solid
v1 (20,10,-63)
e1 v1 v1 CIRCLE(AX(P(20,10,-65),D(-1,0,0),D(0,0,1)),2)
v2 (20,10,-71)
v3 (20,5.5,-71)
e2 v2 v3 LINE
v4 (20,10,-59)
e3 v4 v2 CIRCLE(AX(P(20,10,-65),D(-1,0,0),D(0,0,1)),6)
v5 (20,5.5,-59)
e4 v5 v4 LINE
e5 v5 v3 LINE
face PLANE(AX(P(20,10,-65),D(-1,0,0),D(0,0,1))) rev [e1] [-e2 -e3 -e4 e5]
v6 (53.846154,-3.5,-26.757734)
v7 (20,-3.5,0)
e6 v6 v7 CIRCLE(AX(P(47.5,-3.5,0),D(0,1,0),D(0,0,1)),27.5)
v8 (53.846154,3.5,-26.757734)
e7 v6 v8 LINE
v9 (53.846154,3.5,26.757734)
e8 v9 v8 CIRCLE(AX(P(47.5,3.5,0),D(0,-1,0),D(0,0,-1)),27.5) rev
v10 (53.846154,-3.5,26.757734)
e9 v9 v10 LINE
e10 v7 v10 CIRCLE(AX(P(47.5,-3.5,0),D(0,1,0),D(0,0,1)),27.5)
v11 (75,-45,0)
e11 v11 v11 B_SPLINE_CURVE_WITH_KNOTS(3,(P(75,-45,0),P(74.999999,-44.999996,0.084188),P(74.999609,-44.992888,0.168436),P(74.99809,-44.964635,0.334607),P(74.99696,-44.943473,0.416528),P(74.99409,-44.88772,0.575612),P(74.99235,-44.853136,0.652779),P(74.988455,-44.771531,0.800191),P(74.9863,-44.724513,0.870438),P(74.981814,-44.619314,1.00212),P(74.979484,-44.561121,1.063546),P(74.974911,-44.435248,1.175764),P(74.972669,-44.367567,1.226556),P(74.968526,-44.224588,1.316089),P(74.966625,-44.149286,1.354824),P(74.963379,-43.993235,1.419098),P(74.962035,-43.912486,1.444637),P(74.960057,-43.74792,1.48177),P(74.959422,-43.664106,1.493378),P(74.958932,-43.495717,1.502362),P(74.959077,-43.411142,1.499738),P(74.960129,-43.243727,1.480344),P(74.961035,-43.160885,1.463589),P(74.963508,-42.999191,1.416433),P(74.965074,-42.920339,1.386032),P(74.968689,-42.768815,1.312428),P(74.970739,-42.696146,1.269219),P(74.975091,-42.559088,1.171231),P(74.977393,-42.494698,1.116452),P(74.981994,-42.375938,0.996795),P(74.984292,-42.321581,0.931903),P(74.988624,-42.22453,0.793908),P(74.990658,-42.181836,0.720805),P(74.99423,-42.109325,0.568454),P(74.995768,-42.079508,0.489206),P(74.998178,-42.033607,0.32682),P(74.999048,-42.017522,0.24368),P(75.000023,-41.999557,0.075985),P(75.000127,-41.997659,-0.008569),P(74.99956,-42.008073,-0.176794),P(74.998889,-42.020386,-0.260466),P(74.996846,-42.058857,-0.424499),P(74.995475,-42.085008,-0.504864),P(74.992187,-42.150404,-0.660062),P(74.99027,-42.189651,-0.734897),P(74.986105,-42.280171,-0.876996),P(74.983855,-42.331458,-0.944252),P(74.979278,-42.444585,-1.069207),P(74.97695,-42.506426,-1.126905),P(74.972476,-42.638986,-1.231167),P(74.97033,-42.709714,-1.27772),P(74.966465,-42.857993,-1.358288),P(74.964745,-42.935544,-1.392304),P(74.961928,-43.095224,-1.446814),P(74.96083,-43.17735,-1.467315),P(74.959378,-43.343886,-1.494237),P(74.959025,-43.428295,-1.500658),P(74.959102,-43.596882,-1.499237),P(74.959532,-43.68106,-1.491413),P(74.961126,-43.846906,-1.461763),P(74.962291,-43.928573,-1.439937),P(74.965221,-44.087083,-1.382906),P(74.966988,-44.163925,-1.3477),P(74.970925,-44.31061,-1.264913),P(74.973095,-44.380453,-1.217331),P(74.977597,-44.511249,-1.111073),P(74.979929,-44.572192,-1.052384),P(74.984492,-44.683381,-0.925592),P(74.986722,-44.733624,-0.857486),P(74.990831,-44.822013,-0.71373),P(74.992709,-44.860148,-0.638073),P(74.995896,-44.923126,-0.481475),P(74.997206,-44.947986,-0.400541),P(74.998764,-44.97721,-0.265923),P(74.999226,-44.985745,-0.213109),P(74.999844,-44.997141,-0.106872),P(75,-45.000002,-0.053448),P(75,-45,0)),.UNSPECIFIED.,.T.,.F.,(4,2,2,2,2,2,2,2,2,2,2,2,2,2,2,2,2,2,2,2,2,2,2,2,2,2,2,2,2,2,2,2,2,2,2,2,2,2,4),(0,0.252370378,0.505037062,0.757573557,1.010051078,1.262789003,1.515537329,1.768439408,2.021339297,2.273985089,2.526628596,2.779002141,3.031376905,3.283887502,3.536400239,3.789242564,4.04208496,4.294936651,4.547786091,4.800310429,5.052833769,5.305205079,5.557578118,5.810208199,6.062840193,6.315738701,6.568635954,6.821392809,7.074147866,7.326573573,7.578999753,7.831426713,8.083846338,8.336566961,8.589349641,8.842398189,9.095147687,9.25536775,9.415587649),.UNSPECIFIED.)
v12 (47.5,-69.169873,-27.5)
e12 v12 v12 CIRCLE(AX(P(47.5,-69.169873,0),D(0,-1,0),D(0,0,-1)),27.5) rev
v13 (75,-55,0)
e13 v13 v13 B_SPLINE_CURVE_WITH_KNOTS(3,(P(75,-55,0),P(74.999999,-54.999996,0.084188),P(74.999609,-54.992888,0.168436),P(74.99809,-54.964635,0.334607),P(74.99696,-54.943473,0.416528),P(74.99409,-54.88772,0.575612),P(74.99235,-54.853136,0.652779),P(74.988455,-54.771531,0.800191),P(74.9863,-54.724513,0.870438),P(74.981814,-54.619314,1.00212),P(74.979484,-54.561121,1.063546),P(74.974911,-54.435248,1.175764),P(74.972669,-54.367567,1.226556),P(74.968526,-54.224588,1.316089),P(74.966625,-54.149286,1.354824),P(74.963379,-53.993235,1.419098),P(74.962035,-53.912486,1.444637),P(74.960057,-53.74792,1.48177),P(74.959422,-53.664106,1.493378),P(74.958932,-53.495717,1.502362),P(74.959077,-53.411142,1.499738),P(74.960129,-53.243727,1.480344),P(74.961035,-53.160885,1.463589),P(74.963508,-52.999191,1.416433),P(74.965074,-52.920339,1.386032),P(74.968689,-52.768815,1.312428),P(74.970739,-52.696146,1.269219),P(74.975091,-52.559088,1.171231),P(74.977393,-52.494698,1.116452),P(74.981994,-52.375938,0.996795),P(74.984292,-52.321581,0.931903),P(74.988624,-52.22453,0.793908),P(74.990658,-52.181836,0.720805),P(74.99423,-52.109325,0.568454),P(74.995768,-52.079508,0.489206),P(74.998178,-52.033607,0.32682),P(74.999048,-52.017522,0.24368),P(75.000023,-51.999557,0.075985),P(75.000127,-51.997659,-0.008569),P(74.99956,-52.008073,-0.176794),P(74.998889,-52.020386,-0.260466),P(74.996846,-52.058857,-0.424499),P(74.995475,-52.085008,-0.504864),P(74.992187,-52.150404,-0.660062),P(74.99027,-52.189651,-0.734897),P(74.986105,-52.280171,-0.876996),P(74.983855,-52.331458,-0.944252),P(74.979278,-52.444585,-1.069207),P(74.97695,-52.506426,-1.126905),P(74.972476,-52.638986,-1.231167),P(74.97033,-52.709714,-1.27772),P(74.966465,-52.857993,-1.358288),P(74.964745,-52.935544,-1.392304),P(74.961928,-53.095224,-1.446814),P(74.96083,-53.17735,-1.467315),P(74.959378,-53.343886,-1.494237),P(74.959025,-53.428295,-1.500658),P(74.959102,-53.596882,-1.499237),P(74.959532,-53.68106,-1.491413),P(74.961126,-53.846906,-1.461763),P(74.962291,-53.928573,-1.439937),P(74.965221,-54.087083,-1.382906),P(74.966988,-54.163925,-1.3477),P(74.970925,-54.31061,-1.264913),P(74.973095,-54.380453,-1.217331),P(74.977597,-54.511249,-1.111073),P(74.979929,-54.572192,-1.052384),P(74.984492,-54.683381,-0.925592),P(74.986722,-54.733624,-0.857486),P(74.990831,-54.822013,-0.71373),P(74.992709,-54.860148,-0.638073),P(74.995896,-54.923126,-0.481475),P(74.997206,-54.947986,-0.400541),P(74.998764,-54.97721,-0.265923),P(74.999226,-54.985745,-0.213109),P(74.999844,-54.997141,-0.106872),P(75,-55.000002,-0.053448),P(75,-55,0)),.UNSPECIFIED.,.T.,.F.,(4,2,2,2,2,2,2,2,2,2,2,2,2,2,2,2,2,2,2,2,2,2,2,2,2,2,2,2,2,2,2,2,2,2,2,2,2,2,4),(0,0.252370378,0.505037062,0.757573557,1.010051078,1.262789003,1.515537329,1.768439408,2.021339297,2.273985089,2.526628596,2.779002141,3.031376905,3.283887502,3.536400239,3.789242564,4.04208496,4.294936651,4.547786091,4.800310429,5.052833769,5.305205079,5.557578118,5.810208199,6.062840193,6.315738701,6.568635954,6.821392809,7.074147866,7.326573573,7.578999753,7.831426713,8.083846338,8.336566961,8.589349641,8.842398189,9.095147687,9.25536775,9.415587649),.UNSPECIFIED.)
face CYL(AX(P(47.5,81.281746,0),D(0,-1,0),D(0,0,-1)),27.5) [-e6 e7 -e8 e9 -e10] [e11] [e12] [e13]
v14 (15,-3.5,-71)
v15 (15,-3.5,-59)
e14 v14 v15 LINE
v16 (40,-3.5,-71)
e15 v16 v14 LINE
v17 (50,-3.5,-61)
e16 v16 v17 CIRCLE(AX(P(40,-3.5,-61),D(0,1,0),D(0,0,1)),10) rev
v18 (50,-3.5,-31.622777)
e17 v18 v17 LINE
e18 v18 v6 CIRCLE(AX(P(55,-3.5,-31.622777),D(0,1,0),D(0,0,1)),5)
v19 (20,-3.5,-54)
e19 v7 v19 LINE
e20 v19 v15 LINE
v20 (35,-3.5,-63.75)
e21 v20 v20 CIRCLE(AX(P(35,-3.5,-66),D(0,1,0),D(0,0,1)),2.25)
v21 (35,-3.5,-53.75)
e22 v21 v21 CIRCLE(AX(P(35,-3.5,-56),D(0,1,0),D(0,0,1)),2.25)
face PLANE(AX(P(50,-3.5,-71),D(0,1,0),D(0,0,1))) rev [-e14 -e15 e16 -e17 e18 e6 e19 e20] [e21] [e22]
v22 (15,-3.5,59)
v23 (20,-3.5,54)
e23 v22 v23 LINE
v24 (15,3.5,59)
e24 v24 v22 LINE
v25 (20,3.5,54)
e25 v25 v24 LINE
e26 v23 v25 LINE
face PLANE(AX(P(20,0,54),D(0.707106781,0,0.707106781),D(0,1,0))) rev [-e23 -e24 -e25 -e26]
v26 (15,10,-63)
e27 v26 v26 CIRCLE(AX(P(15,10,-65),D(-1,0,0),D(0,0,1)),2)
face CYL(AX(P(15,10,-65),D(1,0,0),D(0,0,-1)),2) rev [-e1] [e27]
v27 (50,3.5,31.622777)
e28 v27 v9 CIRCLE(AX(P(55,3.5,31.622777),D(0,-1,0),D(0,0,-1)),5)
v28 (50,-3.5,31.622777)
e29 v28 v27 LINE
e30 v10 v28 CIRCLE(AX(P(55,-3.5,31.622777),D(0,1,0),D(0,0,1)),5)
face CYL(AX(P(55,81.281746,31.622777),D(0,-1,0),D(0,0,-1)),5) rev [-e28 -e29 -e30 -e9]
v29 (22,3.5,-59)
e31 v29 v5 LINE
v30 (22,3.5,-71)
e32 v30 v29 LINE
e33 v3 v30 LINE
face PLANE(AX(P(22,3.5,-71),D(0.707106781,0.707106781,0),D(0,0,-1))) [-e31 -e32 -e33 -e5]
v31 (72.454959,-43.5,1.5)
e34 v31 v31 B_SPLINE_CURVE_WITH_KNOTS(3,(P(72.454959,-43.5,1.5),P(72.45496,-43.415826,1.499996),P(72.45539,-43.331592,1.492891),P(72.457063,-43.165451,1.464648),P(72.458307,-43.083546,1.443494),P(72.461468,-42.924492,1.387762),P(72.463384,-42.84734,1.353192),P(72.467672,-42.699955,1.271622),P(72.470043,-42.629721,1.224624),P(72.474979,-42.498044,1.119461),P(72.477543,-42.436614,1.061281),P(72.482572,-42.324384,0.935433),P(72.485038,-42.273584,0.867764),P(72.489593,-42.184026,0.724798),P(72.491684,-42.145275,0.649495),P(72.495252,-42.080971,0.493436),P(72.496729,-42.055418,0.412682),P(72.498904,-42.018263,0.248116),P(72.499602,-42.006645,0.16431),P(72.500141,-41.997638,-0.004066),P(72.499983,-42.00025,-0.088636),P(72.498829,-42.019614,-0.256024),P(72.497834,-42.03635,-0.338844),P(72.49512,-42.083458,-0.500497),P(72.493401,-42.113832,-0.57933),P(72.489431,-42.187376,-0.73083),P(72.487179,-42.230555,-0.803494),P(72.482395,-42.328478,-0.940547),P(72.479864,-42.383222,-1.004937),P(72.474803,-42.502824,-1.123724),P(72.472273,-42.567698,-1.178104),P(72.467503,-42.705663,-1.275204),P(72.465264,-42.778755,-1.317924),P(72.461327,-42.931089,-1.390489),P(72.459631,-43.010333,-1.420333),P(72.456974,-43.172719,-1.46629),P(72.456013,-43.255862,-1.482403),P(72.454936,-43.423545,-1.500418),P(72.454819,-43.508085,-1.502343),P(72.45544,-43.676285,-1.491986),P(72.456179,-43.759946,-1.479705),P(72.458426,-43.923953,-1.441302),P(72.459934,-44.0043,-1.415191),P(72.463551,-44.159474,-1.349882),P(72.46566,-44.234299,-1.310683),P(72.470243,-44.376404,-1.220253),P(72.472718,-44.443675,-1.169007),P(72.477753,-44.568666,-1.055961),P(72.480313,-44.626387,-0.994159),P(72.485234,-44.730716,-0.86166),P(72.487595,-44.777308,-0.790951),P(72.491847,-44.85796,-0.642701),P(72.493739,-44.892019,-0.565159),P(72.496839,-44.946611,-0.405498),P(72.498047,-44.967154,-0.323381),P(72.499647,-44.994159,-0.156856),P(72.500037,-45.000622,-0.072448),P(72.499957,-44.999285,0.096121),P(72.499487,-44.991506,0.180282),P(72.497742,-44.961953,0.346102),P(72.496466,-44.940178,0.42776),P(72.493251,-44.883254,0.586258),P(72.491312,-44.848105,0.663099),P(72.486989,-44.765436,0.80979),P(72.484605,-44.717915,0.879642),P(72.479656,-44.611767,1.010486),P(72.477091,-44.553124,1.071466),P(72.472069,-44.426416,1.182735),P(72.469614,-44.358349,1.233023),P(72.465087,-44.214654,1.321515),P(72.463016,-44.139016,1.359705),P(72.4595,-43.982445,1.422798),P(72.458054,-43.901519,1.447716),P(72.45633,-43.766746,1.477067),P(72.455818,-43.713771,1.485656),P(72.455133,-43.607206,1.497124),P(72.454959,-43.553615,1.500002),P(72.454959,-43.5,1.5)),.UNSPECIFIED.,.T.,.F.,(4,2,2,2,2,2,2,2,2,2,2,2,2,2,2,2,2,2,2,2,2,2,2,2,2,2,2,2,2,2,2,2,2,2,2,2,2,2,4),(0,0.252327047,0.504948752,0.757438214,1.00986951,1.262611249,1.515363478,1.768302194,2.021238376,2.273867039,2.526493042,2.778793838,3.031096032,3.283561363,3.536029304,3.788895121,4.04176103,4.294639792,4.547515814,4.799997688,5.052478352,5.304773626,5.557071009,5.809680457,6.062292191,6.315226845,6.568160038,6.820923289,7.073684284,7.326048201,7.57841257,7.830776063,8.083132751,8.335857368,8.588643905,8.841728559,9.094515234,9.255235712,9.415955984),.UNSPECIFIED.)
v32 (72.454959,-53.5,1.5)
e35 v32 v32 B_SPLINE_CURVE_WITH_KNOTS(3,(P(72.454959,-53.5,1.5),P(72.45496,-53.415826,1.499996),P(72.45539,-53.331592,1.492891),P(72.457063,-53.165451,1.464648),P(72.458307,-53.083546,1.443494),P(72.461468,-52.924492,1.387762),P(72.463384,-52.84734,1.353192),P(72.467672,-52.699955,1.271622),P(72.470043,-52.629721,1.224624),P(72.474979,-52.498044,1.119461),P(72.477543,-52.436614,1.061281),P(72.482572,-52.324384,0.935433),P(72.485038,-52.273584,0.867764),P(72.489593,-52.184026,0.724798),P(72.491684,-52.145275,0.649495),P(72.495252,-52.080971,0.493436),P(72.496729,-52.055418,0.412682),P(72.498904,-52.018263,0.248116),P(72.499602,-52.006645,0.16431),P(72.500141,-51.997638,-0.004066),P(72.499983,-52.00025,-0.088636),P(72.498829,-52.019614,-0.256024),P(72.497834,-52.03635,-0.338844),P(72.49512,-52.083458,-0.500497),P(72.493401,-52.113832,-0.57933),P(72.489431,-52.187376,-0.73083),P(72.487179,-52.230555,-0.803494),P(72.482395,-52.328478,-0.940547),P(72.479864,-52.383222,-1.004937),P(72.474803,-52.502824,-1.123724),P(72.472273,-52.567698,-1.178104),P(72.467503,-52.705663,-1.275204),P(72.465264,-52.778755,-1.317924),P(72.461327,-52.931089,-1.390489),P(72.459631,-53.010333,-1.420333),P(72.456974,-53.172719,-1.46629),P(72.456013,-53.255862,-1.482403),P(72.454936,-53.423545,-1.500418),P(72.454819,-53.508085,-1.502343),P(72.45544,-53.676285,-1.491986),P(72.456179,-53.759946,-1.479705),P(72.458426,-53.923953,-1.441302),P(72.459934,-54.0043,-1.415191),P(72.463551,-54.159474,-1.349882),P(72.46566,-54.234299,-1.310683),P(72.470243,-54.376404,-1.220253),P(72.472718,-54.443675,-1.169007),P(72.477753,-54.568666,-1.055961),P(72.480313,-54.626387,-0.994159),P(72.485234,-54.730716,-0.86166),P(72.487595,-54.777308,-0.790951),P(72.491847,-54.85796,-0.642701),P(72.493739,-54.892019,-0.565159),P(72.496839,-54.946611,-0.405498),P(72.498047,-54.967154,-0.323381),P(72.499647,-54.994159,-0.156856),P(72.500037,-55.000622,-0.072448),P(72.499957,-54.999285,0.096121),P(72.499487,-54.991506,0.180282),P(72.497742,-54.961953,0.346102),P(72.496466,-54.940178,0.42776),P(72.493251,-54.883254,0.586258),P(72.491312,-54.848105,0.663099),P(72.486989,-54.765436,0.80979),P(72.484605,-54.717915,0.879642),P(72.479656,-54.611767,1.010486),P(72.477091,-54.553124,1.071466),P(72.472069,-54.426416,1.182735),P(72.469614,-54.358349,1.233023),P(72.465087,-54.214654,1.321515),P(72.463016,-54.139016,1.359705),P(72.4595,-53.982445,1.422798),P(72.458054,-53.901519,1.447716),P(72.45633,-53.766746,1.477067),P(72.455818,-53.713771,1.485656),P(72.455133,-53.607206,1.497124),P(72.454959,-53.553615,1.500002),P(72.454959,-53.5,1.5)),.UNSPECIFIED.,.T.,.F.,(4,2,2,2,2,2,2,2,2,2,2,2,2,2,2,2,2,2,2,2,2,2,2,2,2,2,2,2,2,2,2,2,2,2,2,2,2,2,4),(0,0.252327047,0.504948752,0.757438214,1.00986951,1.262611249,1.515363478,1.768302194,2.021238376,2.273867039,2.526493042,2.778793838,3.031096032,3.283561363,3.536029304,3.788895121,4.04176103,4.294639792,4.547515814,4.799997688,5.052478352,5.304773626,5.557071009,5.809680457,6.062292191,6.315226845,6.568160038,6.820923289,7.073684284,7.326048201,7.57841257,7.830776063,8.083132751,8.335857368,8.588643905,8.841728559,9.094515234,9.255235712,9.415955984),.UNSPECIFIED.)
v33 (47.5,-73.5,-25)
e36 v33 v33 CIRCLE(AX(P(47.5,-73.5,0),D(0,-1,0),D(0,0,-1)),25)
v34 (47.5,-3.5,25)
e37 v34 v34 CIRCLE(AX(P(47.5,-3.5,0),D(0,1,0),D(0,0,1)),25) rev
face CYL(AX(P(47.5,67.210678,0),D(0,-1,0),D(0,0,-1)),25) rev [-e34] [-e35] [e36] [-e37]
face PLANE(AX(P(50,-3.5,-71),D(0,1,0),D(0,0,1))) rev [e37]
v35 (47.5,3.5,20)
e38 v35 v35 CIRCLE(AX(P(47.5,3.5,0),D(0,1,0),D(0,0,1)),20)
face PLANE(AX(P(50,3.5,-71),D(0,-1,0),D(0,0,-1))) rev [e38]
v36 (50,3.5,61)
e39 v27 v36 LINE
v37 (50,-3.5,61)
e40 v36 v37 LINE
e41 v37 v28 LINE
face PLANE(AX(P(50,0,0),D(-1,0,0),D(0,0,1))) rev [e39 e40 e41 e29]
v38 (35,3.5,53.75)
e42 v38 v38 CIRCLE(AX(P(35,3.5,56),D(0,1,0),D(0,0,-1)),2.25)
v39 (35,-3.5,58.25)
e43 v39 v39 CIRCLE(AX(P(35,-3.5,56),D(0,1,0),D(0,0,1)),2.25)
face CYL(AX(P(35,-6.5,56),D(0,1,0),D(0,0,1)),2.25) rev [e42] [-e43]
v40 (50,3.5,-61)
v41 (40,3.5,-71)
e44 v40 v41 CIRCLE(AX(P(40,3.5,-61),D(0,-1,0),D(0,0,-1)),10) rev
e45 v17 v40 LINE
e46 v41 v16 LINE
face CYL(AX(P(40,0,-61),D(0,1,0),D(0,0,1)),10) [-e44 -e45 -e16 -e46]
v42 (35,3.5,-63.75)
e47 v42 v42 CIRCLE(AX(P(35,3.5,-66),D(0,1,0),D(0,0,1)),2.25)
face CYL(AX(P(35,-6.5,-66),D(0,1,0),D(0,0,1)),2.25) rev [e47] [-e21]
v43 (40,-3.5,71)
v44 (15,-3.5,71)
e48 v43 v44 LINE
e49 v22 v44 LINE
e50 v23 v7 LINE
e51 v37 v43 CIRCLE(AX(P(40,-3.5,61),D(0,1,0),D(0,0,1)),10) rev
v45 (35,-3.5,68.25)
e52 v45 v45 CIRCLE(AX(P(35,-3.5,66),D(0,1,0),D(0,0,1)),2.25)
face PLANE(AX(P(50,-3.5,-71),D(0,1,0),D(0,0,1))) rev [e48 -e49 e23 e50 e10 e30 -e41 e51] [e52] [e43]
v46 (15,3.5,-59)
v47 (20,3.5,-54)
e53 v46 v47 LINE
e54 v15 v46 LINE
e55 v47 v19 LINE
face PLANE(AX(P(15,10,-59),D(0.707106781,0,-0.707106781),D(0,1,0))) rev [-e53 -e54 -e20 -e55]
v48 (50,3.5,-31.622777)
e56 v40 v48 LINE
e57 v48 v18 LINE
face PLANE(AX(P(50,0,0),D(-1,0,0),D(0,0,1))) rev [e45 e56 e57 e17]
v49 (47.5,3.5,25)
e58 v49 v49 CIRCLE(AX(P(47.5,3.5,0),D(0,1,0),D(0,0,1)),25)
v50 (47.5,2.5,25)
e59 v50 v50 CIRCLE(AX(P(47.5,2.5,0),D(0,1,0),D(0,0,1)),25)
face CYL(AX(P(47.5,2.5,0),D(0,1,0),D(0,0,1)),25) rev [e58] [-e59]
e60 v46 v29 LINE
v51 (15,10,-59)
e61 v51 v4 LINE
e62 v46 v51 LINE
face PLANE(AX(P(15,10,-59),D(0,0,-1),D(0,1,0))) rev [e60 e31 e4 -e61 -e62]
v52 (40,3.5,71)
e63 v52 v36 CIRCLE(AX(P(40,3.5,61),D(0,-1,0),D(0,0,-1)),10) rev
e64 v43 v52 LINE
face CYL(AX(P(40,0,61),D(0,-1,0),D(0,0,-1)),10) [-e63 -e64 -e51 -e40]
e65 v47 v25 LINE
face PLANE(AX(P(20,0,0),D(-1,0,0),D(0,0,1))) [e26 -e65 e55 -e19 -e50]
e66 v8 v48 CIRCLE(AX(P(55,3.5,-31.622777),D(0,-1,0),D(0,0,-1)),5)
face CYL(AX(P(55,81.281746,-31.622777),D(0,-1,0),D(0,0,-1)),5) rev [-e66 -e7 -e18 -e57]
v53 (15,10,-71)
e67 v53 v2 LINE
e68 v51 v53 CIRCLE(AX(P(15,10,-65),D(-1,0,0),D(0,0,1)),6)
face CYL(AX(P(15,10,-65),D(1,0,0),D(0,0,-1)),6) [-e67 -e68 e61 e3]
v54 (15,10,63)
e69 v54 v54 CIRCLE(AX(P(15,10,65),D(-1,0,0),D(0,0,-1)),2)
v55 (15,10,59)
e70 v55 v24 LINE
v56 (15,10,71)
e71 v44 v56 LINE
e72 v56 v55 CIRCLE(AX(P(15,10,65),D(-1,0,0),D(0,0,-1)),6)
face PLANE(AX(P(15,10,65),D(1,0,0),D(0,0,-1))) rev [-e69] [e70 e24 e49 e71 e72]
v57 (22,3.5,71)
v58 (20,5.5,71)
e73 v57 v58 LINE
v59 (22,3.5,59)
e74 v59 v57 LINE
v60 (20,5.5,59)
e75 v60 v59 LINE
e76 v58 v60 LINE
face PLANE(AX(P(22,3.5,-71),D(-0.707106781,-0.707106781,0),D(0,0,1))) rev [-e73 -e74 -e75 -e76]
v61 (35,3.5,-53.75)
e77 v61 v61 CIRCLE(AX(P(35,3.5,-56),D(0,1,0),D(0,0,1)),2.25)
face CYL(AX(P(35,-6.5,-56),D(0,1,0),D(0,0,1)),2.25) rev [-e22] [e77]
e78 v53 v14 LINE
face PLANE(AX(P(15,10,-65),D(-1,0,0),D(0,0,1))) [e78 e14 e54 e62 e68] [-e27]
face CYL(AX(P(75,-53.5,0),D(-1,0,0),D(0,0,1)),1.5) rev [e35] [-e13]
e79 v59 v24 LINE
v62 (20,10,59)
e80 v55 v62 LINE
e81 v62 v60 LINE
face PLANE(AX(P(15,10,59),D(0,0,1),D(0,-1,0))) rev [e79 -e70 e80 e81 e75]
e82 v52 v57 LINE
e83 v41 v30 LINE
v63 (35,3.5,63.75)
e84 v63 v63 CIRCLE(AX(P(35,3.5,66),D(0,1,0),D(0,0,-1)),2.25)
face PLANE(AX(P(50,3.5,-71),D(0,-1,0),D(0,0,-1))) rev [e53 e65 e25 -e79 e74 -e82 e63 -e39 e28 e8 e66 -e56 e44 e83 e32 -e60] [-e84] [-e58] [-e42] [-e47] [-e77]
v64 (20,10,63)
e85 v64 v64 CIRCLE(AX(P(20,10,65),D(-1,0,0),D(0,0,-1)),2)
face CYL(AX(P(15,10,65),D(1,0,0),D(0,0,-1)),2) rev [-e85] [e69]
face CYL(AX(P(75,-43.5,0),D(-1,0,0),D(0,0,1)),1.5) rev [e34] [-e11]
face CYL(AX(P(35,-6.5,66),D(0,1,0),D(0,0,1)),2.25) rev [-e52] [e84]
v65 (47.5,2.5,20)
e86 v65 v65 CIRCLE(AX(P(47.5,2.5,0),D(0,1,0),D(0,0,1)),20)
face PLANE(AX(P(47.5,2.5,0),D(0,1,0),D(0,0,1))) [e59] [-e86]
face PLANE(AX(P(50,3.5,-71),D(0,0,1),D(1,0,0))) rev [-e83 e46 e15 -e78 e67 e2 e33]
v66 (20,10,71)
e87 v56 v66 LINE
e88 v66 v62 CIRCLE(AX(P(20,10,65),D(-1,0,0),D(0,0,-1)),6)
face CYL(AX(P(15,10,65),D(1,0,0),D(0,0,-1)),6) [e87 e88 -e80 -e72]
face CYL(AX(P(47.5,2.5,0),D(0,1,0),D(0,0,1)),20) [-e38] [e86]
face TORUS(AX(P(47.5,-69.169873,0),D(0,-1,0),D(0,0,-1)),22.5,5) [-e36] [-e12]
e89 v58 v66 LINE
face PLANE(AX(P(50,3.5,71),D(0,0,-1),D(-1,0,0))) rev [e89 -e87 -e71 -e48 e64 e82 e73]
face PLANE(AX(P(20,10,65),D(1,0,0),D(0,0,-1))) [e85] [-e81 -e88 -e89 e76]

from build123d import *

# Parameters (mm, degrees)
CROQUIS1_R                          = 3
SALIENTE_EXTRUIR1_DEPTH             = 20
SALIENTE_EXTRUIR1_2_DEPTH           = 20
CROQUIS2_W                          = 142
CROQUIS2_H                          = 7
SALIENTE_EXTRUIR2_DEPTH             = 30
CROQUIS3_R                          = 27.5
SALIENTE_EXTRUIR3_DEPTH             = 70
SALIENTE_EXTRUIR3_DIRECTION_2_REACH = 89.121
CROQUIS4_R                          = 25
CORTAR_EXTRUIR1_DEPTH               = 70
CROQUIS5_R                          = 1
CORTAR_EXTRUIR2_DEPTH               = 5
CROQUIS6_R                          = 2.25
CORTAR_EXTRUIR3_DEPTH               = 10
REDONDEO1_R                         = 10
CORTAR_EXTRUIR4_DEPTH               = 117.052789712
CROQUIS8_R                          = 2
SALIENTE_EXTRUIR4_DEPTH             = 5
REDONDEO3_R                         = 5
CHAFL_N2_SIZE                       = 5
CHAFL_N1_SIZE                       = 2
CROQUIS9_R                          = 1.5
CORTAR_EXTRUIR5_DEPTH               = 109.019674134
CORTAR_EXTRUIR6_START               = -1
CROQUIS10_R                         = 25
CROQUIS10_R_2                       = 20
CORTAR_EXTRUIR6_DEPTH               = 1


with BuildPart() as part:
    # Croquis1 → Saliente-Extruir1 (new body)
    with BuildSketch(Plane(origin=(0, 0, 0), x_dir=(0, 0, -1), z_dir=(1, 0, 0))):
        with Locations((-65, 0)):
            Circle(CROQUIS1_R)
    extrude(amount=SALIENTE_EXTRUIR1_DEPTH)



with BuildPart() as body_2:
    # Croquis1 → Saliente-Extruir1 2 (new body)
    with BuildSketch(Plane(origin=(0, 0, 0), x_dir=(0, 0, -1), z_dir=(1, 0, 0))):
        with Locations((65, 0)):
            Circle(CROQUIS1_R)
    extrude(amount=SALIENTE_EXTRUIR1_2_DEPTH)


with BuildPart() as part_1:
    add(part.part)

    add(body_2.part)  # Saliente-Extruir2 merges body 2
    # Croquis2 → Saliente-Extruir2 (add)
    with BuildSketch(Plane(origin=(20, 0, 0), x_dir=(0, 0, -1), z_dir=(1, 0, 0))):
        Rectangle(CROQUIS2_W, CROQUIS2_H)
    extrude(amount=SALIENTE_EXTRUIR2_DEPTH)

    # Croquis3 → Saliente-Extruir3 (add)
    with BuildSketch(Plane.XZ.offset(3.5)):
        with Locations(Location((47.5, 0, 0), (0, 0, 270))):
            Circle(CROQUIS3_R)
    extrude(amount=SALIENTE_EXTRUIR3_DEPTH)

    # Saliente-Extruir3 direction 2: up to this face of the body (flat: up to its plane)
    saliente_extruir3_direction_2_end = Plane(part_1.part.faces().sort_by_distance((35, 3.5, 0))[0])
    # Croquis3 → Saliente-Extruir3 direction 2 (add, up to the picked face)
    with BuildSketch(Plane.XZ.offset(3.5), mode=Mode.PRIVATE) as saliente_extruir3_direction_2_sk1:
        with Locations(Location((47.5, 0, 0), (0, 0, 270))):
            Circle(CROQUIS3_R)
    saliente_extruir3_direction_2_tool1 = split(extrude(saliente_extruir3_direction_2_sk1.sketch, amount=-SALIENTE_EXTRUIR3_DIRECTION_2_REACH, mode=Mode.PRIVATE), bisect_by=saliente_extruir3_direction_2_end, keep=Keep.BOTH, mode=Mode.PRIVATE)
    add(saliente_extruir3_direction_2_tool1.solids().sort_by(Axis((47.5, -3.5, 0), (0, 1, 0)))[0])

    # Croquis4 → Cortar-Extruir1 (cut)
    with BuildSketch(Plane.XZ.offset(73.5)):
        with Locations(Location((47.5, 0, 0), (0, 0, 270))):
            Circle(CROQUIS4_R)
    extrude(amount=-CORTAR_EXTRUIR1_DEPTH, mode=Mode.SUBTRACT)

    # Croquis5 → Cortar-Extruir2 (cut)
    with BuildSketch(Plane.ZY):
        with Locations((-65, 0)):
            Circle(CROQUIS5_R)
        with Locations((65, 0)):
            Circle(CROQUIS5_R)
    extrude(amount=-CORTAR_EXTRUIR2_DEPTH, mode=Mode.SUBTRACT)

    # Croquis6 → Cortar-Extruir3 (cut)
    with BuildSketch(Plane(origin=(0, 3.5, 0), x_dir=(1, 0, 0), z_dir=(0, 1, 0))):
        with Locations(Location((35, 66, 0), (0, 0, 270))):
            Circle(CROQUIS6_R)
        with Locations(Location((35, 56, 0), (0, 0, 270))):
            Circle(CROQUIS6_R)
        with Locations(Location((35, -66, 0), (0, 0, 270))):
            Circle(CROQUIS6_R)
        with Locations(Location((35, -56, 0), (0, 0, 270))):
            Circle(CROQUIS6_R)
    extrude(amount=-CORTAR_EXTRUIR3_DEPTH, mode=Mode.SUBTRACT)

    # Redondeo1
    redondeo1_edges = [part_1.edges().sort_by_distance(p)[0] for p in [
        (50, 0, 71),
        (50, 0, -71),
    ]]
    fillet(redondeo1_edges, radius=REDONDEO1_R)

    # Croquis7 → Cortar-Extruir4 (cut, through all)
    with BuildSketch(Plane.ZY.offset(-20)):
        Polygon((-71, -3.5), (0, -3.5), (71, -3.5), (71, 3.5), (-71, 3.5), align=None)
    extrude(amount=CORTAR_EXTRUIR4_DEPTH, mode=Mode.SUBTRACT)

    # Croquis8 → Saliente-Extruir4 (add)
    # profile 1 of 2: a face of its own
    with BuildSketch(Plane.ZY.offset(-20)):
        with BuildLine():
            Line((-71, 10), (-71, -3.5))
            Line((-71, -3.5), (-59, -3.5))
            Line((-59, -3.5), (-59, 10))
            ThreePointArc((-59, 10), (-65, 16), (-71, 10))
        make_face()
        with Locations((-65, 10)):
            Circle(CROQUIS8_R, mode=Mode.SUBTRACT)
    # profile 2 of 2: a face of its own
    with BuildSketch(Plane.ZY.offset(-20)):
        with BuildLine():
            Line((59, 10), (59, -3.5))
            Line((59, -3.5), (71, -3.5))
            Line((71, -3.5), (71, 10))
            ThreePointArc((71, 10), (65, 16), (59, 10))
        make_face()
        with Locations(Location((65, 10, 0), (0, 0, 180))):
            Circle(CROQUIS8_R, mode=Mode.SUBTRACT)
    extrude(amount=SALIENTE_EXTRUIR4_DEPTH)

    # Redondeo3
    # the kernel refuses this fillet: 5 mm, written as the material it adds along each edge
    with BuildSketch(Plane(origin=(50, 3.5, -27.386127875), x_dir=(0, 0, -1), z_dir=(0, -1, 0))) as redondeo3_piece_1:
        with BuildLine():
            CenterArc((4.236648726, 5), REDONDEO3_R, 193.342363797, 76.657636203)
            ThreePointArc((-0.628393828, 3.846153846), (-0.245979187, 1.934222499), (0, 0))
            Line((0, 0), (4.236648726, 0))
        make_face()
    extrude(amount=7)
    with BuildSketch(Plane(origin=(50, 3.5, 27.386127875), x_dir=(0.9869144977622896, 0, -0.16124445449877534), z_dir=(0, -1, 0))) as redondeo3_piece_2:
        with BuildLine():
            CenterArc((4.251436376, 4.987432323), REDONDEO3_R, 189.279136184, 76.657636203)
            Line((-0.683136113, 4.18121005), (0, 0))
            ThreePointArc((0, 0), (1.948575006, 0.069122226), (3.897150011, 0))
        make_face()
    extrude(amount=7)
    # the kernel refuses this fillet: 5 mm, written as the material it takes off along each edge
    with BuildSketch(Plane(origin=(47.5, -73.5, 0), x_dir=(0, 0, -1), z_dir=(-1, 0, 0))) as redondeo3_2_piece_1:
        with BuildLine():
            CenterArc((22.5, -4.330127019), REDONDEO3_R, 0, 60)
            Line((25, 0), (27.5, 0))
            Line((27.5, 0), (27.5, -4.330127019))
        make_face()
    revolve(axis=Axis((47.5, -73.5, 0), (0, -1, 0)), mode=Mode.SUBTRACT)

    # Chaflán2
    # the kernel refuses this chamfer: 5 mm, written as the material it adds along each edge
    with BuildSketch(Plane(origin=(20, 3.5, 59), x_dir=(0, 0, -1), z_dir=(0, -1, 0)), Plane(origin=(20, -3.5, -59), x_dir=(0, 0, 1), z_dir=(0, 1, 0))) as chafl_n2_piece_1:
        Polygon((CHAFL_N2_SIZE, 0), (0, -CHAFL_N2_SIZE), (0, 0), align=None)
    extrude(amount=7)

    # Chaflán1
    chafl_n1_edges = [part_1.edges().sort_by_distance(p)[0] for p in [
        (20, 3.5, 65),
        (20, 3.5, -65),
    ]]
    chamfer(chafl_n1_edges, length=CHAFL_N1_SIZE)

    # Croquis9 → Cortar-Extruir5 (cut, through all)
    with BuildSketch(Plane(origin=(50, 0, 0), x_dir=(0, 0, -1), z_dir=(1, 0, 0))):
        with Locations(Location((0, -53.5, 0), (0, 0, 180))):
            Circle(CROQUIS9_R)
        with Locations(Location((0, -43.5, 0), (0, 0, 180))):
            Circle(CROQUIS9_R)
    extrude(amount=CORTAR_EXTRUIR5_DEPTH, mode=Mode.SUBTRACT)

    # Croquis10 → Cortar-Extruir6 (cut)
    with BuildSketch(Plane(origin=(0, 3.5, 0), x_dir=(1, 0, 0), z_dir=(0, 1, 0)).offset(CORTAR_EXTRUIR6_START)):
        with Locations(Location((47.5, 0, 0), (0, 0, 90))):
            Circle(CROQUIS10_R)
        with Locations(Location((47.5, 0, 0), (0, 0, 270))):
            Circle(CROQUIS10_R_2, mode=Mode.SUBTRACT)
    extrude(amount=CORTAR_EXTRUIR6_DEPTH, mode=Mode.SUBTRACT)


solid = part_1.part
